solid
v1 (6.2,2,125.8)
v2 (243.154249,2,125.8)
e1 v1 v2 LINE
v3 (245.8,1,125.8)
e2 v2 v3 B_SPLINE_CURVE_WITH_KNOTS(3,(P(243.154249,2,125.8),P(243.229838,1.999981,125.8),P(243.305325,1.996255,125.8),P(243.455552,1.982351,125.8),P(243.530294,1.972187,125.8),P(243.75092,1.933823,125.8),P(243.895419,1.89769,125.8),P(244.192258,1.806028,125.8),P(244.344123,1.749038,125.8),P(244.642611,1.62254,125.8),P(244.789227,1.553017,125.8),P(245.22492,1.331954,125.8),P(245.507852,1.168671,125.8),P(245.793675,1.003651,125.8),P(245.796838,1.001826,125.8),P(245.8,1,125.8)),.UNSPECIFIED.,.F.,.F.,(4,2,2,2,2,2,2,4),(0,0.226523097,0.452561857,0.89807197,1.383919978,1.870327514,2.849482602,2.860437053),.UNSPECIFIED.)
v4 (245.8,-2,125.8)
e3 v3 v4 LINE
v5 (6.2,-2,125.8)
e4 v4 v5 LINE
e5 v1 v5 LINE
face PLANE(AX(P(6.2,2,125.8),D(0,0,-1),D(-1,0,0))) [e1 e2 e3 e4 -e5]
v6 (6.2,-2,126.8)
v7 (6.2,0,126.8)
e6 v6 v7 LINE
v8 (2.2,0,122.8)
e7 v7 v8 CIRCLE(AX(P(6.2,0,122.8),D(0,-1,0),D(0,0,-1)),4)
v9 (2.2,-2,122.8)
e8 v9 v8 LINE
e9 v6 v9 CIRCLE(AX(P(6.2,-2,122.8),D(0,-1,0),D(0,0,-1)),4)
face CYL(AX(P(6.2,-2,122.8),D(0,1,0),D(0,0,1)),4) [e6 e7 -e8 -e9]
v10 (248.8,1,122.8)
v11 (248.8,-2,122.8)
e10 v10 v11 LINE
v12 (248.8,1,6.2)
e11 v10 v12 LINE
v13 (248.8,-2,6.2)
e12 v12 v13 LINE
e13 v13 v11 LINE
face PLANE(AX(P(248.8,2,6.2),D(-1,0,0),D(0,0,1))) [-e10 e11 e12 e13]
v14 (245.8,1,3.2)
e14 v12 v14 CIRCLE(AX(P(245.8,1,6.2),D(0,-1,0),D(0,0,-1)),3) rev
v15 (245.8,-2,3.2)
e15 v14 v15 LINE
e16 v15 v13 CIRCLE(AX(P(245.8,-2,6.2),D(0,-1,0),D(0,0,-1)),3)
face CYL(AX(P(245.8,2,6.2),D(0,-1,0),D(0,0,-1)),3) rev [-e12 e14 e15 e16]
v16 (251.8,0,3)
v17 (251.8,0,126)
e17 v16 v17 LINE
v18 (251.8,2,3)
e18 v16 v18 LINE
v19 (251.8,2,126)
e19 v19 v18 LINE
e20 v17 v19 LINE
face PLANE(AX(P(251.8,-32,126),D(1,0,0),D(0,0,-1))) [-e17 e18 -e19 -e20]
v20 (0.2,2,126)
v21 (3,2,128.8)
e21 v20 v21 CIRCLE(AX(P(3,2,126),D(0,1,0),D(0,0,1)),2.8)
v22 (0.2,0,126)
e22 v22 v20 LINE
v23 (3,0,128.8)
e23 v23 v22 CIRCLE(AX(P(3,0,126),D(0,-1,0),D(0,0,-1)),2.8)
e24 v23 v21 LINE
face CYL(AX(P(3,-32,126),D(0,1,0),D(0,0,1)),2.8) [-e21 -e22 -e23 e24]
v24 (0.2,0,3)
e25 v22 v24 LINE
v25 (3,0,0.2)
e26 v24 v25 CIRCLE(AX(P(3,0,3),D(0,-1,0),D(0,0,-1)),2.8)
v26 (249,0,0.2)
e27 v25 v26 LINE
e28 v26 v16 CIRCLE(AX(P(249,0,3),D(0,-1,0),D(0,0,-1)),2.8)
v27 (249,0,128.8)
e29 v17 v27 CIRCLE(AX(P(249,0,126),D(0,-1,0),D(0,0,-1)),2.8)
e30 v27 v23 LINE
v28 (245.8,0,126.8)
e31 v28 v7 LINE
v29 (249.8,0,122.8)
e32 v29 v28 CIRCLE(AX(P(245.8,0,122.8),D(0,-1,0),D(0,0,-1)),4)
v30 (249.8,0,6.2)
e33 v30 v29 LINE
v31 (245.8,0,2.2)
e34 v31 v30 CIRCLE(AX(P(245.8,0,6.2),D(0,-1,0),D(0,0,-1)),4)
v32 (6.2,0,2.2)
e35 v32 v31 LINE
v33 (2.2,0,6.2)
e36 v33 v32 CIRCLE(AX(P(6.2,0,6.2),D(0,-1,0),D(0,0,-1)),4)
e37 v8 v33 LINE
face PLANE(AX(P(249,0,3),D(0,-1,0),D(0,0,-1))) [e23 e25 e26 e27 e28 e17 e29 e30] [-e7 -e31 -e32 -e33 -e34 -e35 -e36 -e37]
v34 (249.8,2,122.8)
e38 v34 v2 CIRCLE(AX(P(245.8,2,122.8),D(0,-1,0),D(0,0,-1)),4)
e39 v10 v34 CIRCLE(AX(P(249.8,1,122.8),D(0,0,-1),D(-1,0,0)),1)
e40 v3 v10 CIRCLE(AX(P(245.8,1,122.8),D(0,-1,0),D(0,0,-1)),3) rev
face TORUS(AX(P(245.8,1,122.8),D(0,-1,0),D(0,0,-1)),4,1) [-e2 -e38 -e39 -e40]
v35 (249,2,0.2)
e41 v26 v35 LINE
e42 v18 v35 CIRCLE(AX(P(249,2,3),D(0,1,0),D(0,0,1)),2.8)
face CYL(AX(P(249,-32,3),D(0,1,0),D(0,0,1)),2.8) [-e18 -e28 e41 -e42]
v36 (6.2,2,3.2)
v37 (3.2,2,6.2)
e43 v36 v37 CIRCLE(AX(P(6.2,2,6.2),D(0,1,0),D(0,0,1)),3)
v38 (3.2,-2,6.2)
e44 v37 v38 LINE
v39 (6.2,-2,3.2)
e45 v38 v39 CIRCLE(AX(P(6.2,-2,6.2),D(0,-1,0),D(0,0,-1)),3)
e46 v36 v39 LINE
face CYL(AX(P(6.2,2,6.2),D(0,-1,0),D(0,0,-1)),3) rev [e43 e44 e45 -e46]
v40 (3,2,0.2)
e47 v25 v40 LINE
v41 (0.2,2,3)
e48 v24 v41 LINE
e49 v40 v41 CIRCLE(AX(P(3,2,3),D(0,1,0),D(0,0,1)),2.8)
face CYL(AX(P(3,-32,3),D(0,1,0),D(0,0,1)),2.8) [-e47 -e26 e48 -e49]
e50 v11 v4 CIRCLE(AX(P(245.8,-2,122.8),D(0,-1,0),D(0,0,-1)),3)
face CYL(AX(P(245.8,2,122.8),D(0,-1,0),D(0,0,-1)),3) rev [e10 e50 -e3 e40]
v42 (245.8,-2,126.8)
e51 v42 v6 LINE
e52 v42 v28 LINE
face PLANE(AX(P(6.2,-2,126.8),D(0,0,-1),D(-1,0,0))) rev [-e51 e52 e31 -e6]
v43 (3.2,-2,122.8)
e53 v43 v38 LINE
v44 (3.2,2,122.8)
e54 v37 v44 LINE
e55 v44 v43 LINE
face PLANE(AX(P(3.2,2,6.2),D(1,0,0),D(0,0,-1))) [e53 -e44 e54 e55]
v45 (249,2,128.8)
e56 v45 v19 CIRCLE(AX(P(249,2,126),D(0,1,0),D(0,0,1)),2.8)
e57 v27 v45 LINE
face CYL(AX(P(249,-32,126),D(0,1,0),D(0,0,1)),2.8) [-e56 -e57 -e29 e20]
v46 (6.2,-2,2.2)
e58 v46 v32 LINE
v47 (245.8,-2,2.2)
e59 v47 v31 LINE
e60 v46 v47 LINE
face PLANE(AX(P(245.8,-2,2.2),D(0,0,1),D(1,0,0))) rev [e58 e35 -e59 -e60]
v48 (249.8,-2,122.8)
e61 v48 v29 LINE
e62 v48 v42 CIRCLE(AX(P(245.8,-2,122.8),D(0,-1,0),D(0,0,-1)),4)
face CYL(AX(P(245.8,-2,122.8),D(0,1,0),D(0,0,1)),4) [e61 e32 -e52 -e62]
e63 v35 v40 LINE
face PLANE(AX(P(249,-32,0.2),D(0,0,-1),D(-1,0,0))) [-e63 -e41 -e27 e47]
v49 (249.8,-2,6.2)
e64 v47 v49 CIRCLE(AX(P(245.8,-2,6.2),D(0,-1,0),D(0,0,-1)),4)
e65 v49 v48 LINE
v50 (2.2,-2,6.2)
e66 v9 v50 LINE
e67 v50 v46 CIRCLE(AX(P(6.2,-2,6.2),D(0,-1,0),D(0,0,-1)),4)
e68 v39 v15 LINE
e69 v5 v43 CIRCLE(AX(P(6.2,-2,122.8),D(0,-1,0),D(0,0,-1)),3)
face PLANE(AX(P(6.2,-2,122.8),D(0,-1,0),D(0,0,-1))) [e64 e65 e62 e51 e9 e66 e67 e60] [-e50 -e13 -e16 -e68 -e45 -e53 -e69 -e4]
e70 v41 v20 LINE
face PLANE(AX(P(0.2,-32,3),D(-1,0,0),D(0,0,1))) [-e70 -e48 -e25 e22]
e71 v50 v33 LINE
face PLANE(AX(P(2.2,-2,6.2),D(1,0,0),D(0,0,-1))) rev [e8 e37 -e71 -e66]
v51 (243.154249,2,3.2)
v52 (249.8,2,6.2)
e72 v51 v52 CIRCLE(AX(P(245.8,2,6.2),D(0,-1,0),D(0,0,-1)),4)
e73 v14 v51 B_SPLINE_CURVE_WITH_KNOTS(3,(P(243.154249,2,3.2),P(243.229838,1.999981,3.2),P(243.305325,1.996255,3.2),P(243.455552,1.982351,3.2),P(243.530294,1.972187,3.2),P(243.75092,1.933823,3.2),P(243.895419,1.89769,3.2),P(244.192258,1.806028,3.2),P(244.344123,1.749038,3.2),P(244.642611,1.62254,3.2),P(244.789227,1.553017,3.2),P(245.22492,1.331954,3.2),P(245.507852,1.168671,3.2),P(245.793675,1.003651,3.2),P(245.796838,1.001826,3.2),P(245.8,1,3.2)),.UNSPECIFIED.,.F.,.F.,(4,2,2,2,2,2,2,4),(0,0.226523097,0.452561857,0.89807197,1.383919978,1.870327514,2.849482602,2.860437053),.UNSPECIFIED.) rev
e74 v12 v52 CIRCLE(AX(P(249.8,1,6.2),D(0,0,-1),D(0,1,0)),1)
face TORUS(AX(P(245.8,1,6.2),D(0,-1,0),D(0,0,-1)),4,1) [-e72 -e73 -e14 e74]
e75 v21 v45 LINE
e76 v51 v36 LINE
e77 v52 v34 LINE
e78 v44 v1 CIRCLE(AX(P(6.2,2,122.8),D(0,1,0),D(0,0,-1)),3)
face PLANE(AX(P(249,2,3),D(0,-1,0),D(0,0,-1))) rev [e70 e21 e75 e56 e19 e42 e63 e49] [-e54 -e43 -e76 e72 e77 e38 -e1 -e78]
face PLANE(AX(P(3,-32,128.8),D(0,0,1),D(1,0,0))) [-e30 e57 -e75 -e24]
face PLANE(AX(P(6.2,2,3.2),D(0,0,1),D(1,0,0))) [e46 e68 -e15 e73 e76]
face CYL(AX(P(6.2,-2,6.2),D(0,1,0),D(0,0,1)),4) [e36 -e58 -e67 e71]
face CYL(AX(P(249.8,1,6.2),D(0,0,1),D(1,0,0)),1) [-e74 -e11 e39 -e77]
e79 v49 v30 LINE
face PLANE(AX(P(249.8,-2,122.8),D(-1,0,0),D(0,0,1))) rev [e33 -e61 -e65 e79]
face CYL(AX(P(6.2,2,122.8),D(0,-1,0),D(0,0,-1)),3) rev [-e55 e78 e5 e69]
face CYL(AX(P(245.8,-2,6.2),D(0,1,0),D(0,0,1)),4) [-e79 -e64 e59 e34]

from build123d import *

# Parameters (mm, degrees)
AUFSATZ_LINEAR_AUSTRAGEN1_DEPTH = 2
AUFSATZ_LINEAR_START            = 2
AUFSATZ_LINEAR_AUSTRAGEN2_DEPTH = 2
SCHNITT_LINEAR_START            = -34
SCHNITT_LINEAR_AUSTRAGEN1_DEPTH = 34
VERRUNDUNG2_START               = 6.1999999
VERRUNDUNG2_3_DEPTH             = 116.6000001


with BuildPart() as part:
    # Skizze1 → Aufsatz-Linear austragen1 (new body)
    with BuildSketch(Plane(origin=(0, 0, 0), x_dir=(1, 0, 0), z_dir=(0, 1, 0))):
        with BuildLine():
            Line((3, 0), (249, 0))
            ThreePointArc((249, 0), (251.121320344, -0.878679656), (252, -3))
            Line((252, -3), (252, -126))
            ThreePointArc((252, -126), (251.121320344, -128.121320344), (249, -129))
            Line((249, -129), (3, -129))
            ThreePointArc((3, -129), (0.878679656, -128.121320344), (0, -126))
            Line((0, -126), (0, -3))
            ThreePointArc((0, -3), (0.878679656, -0.878679656), (3, 0))
        make_face()
        with BuildLine():
            Line((6.2, -3.2), (245.8, -3.2))
            ThreePointArc((245.8, -3.2), (247.921320344, -4.078679656), (248.8, -6.2))
            Line((248.8, -6.2), (248.8, -122.8))
            ThreePointArc((248.8, -122.8), (247.921320344, -124.921320344), (245.8, -125.8))
            Line((245.8, -125.8), (6.2, -125.8))
            ThreePointArc((6.2, -125.8), (4.078679656, -124.921320344), (3.2, -122.8))
            Line((3.2, -122.8), (3.2, -6.2))
            ThreePointArc((3.2, -6.2), (4.078679656, -4.078679656), (6.2, -3.2))
        make_face(mode=Mode.SUBTRACT)
    extrude(amount=AUFSATZ_LINEAR_AUSTRAGEN1_DEPTH)

    # Skizze2 → Aufsatz-Linear austragen2 (add)
    with BuildSketch(Plane.XZ.offset(AUFSATZ_LINEAR_START)):
        with BuildLine():
            Line((6.2, 126.8), (245.8, 126.8))
            ThreePointArc((245.8, 126.8), (248.628427125, 125.628427125), (249.8, 122.8))
            Line((249.8, 122.8), (249.8, 6.2))
            ThreePointArc((249.8, 6.2), (248.628427125, 3.371572875), (245.8, 2.2))
            Line((245.8, 2.2), (6.2, 2.2))
            ThreePointArc((6.2, 2.2), (3.371572875, 3.371572875), (2.2, 6.2))
            Line((2.2, 6.2), (2.2, 122.8))
            ThreePointArc((2.2, 122.8), (3.371572875, 125.628427125), (6.2, 126.8))
        make_face()
        with BuildLine():
            Line((248.8, 122.8), (248.8, 6.2))
            ThreePointArc((248.8, 6.2), (247.921320344, 4.078679656), (245.8, 3.2))
            Line((245.8, 3.2), (6.2, 3.2))
            ThreePointArc((6.2, 3.2), (4.078679656, 4.078679656), (3.2, 6.2))
            Line((3.2, 6.2), (3.2, 122.8))
            ThreePointArc((3.2, 122.8), (4.078679656, 124.921320344), (6.2, 125.8))
            Line((6.2, 125.8), (245.8, 125.8))
            ThreePointArc((245.8, 125.8), (247.921320344, 124.921320344), (248.8, 122.8))
        make_face(mode=Mode.SUBTRACT)
    extrude(amount=-AUFSATZ_LINEAR_AUSTRAGEN2_DEPTH)

    # Skizze3 → Schnitt-Linear austragen1 (cut)
    with BuildSketch(Plane(origin=(0, 2, 0), x_dir=(1, 0, 0), z_dir=(0, 1, 0)).offset(SCHNITT_LINEAR_START)):
        with BuildLine():
            Line((249, 0), (3, 0))
            ThreePointArc((3, 0), (0.878679656, -0.878679656), (0, -3))
            Line((0, -3), (0, -126))
            ThreePointArc((0, -126), (0.878679656, -128.121320344), (3, -129))
            Line((3, -129), (249, -129))
            ThreePointArc((249, -129), (251.121320344, -128.121320344), (252, -126))
            Line((252, -126), (252, -3))
            ThreePointArc((252, -3), (251.121320344, -0.878679656), (249, 0))
        make_face()
        with BuildLine():
            Line((249, -0.2), (3, -0.2))
            ThreePointArc((3, -0.2), (1.020101013, -1.020101013), (0.2, -3))
            Line((0.2, -3), (0.2, -126))
            ThreePointArc((0.2, -126), (1.020101013, -127.979898987), (3, -128.8))
            Line((3, -128.8), (249, -128.8))
            ThreePointArc((249, -128.8), (250.979898987, -127.979898987), (251.8, -126))
            Line((251.8, -126), (251.8, -3))
            ThreePointArc((251.8, -3), (250.979898987, -1.020101013), (249, -0.2))
        make_face(mode=Mode.SUBTRACT)
    extrude(amount=SCHNITT_LINEAR_AUSTRAGEN1_DEPTH, mode=Mode.SUBTRACT)

    # Verrundung2: read off the stored shape, not the designer's step
    # Verrundung2 outline → Verrundung2 (revolve, cut)
    with BuildSketch(Plane(origin=(245.8, 0, 122.8), x_dir=(1, 0, 0), z_dir=(0, 0, 1))):
        with BuildLine():
            Line((3, 2), (3, 1))
            ThreePointArc((3, 1), (3.292893219, 1.707106781), (4, 2))
            Line((4, 2), (3, 2))
        make_face()
    revolve(axis=Axis((245.8, 0, 122.8), (0, 1, 0)), mode=Mode.SUBTRACT)

    # Verrundung2 2 outline → Verrundung2 2 (revolve, cut)
    with BuildSketch(Plane(origin=(245.8, 0, 6.2), x_dir=(1, 0, 0), z_dir=(0, 0, 1))):
        with BuildLine():
            Line((3, 2), (3, 1))
            ThreePointArc((3, 1), (3.292893219, 1.707106781), (4, 2))
            Line((4, 2), (3, 2))
        make_face()
    revolve(axis=Axis((245.8, 0, 6.2), (0, 1, 0)), mode=Mode.SUBTRACT)

    # Verrundung2 3 outline → Verrundung2 3 (cut)
    with BuildSketch(Plane.XY.offset(VERRUNDUNG2_START)):
        with BuildLine():
            ThreePointArc((248.8, 1), (249.092893219, 1.707106781), (249.8, 2))
            Line((249.8, 2), (248.8, 2))
            Line((248.8, 2), (248.8, 1))
        make_face()
    extrude(amount=VERRUNDUNG2_3_DEPTH, mode=Mode.SUBTRACT)


solid = part.part
